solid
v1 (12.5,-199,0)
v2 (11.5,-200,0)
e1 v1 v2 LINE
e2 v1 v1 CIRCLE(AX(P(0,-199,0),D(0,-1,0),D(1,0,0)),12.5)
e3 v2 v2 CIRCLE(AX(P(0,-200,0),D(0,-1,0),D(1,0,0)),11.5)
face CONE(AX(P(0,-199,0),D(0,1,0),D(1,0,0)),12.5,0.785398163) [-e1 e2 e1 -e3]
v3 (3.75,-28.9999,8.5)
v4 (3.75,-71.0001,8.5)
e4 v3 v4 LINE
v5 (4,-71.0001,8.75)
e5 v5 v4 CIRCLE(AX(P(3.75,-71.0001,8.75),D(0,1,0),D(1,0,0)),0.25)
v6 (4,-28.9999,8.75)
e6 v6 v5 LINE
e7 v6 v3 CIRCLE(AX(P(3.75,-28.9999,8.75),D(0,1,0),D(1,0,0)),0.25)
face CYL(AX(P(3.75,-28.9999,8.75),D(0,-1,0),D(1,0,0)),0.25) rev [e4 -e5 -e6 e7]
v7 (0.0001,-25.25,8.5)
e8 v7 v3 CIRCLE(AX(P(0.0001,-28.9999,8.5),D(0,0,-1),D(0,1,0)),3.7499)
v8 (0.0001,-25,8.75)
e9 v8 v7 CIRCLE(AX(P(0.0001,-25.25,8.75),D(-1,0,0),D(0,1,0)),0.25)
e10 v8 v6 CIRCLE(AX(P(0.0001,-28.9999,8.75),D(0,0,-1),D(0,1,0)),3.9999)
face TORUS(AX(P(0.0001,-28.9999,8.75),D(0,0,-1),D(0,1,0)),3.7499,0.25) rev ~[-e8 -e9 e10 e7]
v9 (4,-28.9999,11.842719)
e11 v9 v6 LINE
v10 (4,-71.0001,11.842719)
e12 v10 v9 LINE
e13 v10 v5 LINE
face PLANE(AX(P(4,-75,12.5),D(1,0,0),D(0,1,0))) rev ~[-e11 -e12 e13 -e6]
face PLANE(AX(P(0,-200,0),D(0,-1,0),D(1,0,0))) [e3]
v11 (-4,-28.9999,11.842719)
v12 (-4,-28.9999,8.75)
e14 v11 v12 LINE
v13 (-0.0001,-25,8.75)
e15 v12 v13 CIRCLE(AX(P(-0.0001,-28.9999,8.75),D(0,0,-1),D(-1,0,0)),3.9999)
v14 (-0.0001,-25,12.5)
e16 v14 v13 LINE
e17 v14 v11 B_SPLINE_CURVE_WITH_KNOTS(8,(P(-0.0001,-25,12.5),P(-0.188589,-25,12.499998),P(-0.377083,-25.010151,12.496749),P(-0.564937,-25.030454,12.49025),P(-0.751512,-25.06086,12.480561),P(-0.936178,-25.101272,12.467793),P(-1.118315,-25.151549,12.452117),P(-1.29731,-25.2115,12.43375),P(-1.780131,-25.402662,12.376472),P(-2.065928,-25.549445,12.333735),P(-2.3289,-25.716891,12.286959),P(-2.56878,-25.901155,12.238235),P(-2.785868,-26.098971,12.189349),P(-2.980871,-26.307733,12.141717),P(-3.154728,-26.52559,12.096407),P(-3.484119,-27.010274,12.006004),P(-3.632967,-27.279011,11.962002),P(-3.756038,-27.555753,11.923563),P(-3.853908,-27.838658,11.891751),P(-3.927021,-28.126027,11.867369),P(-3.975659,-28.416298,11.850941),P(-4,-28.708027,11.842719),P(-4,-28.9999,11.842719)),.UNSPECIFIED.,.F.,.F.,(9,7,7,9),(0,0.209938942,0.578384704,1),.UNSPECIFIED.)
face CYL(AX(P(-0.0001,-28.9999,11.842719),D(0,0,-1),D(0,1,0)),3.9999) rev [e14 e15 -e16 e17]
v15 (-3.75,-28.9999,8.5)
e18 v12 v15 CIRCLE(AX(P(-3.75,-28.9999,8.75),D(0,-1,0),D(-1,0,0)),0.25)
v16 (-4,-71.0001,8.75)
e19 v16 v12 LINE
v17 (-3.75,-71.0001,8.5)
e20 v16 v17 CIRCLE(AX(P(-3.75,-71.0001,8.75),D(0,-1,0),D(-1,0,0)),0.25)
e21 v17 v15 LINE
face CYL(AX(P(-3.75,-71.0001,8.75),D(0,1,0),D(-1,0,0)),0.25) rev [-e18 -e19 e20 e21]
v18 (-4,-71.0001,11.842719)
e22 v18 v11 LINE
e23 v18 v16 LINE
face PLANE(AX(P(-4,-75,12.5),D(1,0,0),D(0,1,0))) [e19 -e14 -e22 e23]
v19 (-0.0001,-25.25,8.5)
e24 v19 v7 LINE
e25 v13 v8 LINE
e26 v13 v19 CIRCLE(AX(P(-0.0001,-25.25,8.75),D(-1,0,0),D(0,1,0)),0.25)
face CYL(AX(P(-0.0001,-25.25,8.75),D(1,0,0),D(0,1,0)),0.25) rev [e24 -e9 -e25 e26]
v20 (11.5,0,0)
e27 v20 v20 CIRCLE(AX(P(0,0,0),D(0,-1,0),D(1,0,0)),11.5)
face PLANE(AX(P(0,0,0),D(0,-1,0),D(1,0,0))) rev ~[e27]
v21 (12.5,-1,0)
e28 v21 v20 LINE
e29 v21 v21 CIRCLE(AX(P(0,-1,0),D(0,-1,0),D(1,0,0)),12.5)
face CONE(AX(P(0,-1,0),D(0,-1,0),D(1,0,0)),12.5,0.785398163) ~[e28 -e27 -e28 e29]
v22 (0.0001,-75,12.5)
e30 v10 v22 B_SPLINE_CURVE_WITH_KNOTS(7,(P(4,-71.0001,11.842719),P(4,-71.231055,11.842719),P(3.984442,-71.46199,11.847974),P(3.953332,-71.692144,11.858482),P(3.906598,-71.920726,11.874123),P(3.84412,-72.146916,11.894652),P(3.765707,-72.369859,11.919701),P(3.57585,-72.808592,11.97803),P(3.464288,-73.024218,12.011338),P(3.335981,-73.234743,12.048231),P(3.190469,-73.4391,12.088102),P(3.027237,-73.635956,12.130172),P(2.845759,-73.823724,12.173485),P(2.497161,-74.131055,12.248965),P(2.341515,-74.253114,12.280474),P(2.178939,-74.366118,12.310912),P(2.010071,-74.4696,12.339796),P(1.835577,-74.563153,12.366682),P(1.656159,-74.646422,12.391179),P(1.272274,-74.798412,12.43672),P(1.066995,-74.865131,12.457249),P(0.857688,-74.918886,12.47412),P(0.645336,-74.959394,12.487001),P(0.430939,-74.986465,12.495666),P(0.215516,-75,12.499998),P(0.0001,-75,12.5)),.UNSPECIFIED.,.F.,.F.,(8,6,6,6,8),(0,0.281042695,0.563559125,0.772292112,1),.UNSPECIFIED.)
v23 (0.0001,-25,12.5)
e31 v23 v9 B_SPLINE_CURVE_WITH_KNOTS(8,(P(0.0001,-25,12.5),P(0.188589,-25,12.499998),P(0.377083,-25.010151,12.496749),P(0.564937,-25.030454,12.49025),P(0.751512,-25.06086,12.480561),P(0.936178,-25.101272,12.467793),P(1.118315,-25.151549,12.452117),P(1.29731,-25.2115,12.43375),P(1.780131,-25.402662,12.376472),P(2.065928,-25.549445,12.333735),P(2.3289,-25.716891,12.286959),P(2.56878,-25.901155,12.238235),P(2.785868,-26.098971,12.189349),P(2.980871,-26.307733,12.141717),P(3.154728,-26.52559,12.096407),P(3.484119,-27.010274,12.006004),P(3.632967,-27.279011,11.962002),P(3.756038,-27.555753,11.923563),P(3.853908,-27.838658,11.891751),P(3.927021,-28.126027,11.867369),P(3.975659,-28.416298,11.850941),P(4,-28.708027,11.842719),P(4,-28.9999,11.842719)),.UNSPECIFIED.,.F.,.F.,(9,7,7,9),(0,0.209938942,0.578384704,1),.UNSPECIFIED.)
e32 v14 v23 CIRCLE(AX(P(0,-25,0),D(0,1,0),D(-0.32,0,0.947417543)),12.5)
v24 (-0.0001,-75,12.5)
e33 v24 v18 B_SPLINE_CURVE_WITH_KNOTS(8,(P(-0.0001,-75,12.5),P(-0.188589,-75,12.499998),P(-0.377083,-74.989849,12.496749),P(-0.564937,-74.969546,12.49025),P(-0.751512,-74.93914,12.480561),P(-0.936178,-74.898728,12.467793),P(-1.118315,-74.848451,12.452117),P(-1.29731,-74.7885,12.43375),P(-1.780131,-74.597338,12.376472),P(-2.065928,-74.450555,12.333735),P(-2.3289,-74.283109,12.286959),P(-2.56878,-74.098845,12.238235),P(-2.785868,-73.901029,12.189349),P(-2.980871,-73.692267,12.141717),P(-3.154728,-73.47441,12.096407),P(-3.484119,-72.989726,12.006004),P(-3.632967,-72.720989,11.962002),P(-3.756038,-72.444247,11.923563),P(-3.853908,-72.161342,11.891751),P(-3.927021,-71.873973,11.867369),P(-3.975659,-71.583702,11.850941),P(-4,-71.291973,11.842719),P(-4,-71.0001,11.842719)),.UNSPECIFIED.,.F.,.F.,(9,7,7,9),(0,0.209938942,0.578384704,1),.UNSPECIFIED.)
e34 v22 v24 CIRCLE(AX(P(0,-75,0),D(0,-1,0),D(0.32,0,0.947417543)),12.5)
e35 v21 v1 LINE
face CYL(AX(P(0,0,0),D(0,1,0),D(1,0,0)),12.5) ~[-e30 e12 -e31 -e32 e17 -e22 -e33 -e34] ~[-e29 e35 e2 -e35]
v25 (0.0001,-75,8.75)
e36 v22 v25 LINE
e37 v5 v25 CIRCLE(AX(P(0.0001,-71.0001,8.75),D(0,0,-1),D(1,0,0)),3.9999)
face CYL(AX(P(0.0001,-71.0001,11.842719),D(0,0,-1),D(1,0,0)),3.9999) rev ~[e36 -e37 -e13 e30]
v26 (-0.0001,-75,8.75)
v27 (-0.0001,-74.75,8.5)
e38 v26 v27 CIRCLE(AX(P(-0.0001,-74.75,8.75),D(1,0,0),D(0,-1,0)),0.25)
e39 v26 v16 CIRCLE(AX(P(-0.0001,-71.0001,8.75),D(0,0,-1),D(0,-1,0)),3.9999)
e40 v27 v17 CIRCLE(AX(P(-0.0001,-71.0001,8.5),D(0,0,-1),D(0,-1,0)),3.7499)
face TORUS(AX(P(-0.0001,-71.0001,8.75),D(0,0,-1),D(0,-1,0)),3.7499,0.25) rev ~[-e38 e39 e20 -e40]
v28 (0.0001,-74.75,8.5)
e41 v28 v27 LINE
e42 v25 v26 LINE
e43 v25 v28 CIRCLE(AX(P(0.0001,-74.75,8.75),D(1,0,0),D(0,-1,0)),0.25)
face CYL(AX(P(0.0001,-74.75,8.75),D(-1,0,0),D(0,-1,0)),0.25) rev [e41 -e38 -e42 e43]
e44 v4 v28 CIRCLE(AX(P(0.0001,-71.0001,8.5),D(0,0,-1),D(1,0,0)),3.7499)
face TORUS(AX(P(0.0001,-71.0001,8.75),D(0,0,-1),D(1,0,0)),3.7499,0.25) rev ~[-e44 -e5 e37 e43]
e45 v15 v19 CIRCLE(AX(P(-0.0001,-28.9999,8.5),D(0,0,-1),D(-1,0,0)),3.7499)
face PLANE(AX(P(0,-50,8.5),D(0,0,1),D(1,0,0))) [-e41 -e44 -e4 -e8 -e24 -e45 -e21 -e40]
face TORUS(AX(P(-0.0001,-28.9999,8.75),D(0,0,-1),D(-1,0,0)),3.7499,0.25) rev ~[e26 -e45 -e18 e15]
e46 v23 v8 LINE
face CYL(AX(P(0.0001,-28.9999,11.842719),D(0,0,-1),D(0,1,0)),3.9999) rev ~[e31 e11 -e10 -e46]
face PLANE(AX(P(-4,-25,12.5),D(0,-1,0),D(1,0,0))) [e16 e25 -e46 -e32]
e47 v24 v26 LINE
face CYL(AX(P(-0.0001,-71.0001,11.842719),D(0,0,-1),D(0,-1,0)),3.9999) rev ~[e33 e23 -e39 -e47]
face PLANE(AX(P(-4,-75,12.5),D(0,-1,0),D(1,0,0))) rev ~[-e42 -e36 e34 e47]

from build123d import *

# Parameters (mm, degrees)
F0_R     = 12.5
F1_DEPTH = 200
F3_W     = 8
F3_H     = 50
F4_DEPTH = 4
F5_R     = 3.9999
F6_R     = 0.25
F7_SIZE  = 1


# Not quite as in the source:
# - a fillet or chamfer is up to 0.001 mm smaller than in the source, because OpenCascade refuses the exact size


with BuildPart() as f1:
    # F0 (on Front) → F1 (new body)
    with BuildSketch(Plane.XZ):
        Circle(F0_R)
    extrude(amount=F1_DEPTH)

    # F3 (on offset) → F4 (cut)
    with BuildSketch(Plane.XY.offset(12.5)):
        with Locations((0, -50)):
            Rectangle(F3_W, F3_H)
    extrude(amount=-F4_DEPTH, mode=Mode.SUBTRACT)

    # F5 (radius 4 in the source; OpenCascade refuses exactly that, so slightly less here)
    f5_edges = [f1.edges().sort_by_distance(p)[0] for p in [
        (-4, -25, 10.17136),
        (4, -25, 10.17136),
        (4, -75, 10.17136),
        (-4, -75, 10.17136),
    ]]
    fillet(f5_edges, radius=F5_R)

    # F6
    f6_edges = [f1.edges().sort_by_distance(p)[0] for p in [
        (0, -25, 8.5),
        (2.828456, -26.171544, 8.5),
        (-2.828456, -26.171544, 8.5),
        (4, -50, 8.5),
        (-4, -50, 8.5),
        (2.828456, -73.828456, 8.5),
        (-2.828456, -73.828456, 8.5),
        (0, -75, 8.5),
    ]]
    fillet(f6_edges, radius=F6_R)

    # F7
    f7_edges = [f1.edges().sort_by_distance(p)[0] for p in [
        (-12.5, -200, 0),
        (-12.5, 0, 0),
    ]]
    chamfer(f7_edges, length=F7_SIZE)


solid = f1.part
